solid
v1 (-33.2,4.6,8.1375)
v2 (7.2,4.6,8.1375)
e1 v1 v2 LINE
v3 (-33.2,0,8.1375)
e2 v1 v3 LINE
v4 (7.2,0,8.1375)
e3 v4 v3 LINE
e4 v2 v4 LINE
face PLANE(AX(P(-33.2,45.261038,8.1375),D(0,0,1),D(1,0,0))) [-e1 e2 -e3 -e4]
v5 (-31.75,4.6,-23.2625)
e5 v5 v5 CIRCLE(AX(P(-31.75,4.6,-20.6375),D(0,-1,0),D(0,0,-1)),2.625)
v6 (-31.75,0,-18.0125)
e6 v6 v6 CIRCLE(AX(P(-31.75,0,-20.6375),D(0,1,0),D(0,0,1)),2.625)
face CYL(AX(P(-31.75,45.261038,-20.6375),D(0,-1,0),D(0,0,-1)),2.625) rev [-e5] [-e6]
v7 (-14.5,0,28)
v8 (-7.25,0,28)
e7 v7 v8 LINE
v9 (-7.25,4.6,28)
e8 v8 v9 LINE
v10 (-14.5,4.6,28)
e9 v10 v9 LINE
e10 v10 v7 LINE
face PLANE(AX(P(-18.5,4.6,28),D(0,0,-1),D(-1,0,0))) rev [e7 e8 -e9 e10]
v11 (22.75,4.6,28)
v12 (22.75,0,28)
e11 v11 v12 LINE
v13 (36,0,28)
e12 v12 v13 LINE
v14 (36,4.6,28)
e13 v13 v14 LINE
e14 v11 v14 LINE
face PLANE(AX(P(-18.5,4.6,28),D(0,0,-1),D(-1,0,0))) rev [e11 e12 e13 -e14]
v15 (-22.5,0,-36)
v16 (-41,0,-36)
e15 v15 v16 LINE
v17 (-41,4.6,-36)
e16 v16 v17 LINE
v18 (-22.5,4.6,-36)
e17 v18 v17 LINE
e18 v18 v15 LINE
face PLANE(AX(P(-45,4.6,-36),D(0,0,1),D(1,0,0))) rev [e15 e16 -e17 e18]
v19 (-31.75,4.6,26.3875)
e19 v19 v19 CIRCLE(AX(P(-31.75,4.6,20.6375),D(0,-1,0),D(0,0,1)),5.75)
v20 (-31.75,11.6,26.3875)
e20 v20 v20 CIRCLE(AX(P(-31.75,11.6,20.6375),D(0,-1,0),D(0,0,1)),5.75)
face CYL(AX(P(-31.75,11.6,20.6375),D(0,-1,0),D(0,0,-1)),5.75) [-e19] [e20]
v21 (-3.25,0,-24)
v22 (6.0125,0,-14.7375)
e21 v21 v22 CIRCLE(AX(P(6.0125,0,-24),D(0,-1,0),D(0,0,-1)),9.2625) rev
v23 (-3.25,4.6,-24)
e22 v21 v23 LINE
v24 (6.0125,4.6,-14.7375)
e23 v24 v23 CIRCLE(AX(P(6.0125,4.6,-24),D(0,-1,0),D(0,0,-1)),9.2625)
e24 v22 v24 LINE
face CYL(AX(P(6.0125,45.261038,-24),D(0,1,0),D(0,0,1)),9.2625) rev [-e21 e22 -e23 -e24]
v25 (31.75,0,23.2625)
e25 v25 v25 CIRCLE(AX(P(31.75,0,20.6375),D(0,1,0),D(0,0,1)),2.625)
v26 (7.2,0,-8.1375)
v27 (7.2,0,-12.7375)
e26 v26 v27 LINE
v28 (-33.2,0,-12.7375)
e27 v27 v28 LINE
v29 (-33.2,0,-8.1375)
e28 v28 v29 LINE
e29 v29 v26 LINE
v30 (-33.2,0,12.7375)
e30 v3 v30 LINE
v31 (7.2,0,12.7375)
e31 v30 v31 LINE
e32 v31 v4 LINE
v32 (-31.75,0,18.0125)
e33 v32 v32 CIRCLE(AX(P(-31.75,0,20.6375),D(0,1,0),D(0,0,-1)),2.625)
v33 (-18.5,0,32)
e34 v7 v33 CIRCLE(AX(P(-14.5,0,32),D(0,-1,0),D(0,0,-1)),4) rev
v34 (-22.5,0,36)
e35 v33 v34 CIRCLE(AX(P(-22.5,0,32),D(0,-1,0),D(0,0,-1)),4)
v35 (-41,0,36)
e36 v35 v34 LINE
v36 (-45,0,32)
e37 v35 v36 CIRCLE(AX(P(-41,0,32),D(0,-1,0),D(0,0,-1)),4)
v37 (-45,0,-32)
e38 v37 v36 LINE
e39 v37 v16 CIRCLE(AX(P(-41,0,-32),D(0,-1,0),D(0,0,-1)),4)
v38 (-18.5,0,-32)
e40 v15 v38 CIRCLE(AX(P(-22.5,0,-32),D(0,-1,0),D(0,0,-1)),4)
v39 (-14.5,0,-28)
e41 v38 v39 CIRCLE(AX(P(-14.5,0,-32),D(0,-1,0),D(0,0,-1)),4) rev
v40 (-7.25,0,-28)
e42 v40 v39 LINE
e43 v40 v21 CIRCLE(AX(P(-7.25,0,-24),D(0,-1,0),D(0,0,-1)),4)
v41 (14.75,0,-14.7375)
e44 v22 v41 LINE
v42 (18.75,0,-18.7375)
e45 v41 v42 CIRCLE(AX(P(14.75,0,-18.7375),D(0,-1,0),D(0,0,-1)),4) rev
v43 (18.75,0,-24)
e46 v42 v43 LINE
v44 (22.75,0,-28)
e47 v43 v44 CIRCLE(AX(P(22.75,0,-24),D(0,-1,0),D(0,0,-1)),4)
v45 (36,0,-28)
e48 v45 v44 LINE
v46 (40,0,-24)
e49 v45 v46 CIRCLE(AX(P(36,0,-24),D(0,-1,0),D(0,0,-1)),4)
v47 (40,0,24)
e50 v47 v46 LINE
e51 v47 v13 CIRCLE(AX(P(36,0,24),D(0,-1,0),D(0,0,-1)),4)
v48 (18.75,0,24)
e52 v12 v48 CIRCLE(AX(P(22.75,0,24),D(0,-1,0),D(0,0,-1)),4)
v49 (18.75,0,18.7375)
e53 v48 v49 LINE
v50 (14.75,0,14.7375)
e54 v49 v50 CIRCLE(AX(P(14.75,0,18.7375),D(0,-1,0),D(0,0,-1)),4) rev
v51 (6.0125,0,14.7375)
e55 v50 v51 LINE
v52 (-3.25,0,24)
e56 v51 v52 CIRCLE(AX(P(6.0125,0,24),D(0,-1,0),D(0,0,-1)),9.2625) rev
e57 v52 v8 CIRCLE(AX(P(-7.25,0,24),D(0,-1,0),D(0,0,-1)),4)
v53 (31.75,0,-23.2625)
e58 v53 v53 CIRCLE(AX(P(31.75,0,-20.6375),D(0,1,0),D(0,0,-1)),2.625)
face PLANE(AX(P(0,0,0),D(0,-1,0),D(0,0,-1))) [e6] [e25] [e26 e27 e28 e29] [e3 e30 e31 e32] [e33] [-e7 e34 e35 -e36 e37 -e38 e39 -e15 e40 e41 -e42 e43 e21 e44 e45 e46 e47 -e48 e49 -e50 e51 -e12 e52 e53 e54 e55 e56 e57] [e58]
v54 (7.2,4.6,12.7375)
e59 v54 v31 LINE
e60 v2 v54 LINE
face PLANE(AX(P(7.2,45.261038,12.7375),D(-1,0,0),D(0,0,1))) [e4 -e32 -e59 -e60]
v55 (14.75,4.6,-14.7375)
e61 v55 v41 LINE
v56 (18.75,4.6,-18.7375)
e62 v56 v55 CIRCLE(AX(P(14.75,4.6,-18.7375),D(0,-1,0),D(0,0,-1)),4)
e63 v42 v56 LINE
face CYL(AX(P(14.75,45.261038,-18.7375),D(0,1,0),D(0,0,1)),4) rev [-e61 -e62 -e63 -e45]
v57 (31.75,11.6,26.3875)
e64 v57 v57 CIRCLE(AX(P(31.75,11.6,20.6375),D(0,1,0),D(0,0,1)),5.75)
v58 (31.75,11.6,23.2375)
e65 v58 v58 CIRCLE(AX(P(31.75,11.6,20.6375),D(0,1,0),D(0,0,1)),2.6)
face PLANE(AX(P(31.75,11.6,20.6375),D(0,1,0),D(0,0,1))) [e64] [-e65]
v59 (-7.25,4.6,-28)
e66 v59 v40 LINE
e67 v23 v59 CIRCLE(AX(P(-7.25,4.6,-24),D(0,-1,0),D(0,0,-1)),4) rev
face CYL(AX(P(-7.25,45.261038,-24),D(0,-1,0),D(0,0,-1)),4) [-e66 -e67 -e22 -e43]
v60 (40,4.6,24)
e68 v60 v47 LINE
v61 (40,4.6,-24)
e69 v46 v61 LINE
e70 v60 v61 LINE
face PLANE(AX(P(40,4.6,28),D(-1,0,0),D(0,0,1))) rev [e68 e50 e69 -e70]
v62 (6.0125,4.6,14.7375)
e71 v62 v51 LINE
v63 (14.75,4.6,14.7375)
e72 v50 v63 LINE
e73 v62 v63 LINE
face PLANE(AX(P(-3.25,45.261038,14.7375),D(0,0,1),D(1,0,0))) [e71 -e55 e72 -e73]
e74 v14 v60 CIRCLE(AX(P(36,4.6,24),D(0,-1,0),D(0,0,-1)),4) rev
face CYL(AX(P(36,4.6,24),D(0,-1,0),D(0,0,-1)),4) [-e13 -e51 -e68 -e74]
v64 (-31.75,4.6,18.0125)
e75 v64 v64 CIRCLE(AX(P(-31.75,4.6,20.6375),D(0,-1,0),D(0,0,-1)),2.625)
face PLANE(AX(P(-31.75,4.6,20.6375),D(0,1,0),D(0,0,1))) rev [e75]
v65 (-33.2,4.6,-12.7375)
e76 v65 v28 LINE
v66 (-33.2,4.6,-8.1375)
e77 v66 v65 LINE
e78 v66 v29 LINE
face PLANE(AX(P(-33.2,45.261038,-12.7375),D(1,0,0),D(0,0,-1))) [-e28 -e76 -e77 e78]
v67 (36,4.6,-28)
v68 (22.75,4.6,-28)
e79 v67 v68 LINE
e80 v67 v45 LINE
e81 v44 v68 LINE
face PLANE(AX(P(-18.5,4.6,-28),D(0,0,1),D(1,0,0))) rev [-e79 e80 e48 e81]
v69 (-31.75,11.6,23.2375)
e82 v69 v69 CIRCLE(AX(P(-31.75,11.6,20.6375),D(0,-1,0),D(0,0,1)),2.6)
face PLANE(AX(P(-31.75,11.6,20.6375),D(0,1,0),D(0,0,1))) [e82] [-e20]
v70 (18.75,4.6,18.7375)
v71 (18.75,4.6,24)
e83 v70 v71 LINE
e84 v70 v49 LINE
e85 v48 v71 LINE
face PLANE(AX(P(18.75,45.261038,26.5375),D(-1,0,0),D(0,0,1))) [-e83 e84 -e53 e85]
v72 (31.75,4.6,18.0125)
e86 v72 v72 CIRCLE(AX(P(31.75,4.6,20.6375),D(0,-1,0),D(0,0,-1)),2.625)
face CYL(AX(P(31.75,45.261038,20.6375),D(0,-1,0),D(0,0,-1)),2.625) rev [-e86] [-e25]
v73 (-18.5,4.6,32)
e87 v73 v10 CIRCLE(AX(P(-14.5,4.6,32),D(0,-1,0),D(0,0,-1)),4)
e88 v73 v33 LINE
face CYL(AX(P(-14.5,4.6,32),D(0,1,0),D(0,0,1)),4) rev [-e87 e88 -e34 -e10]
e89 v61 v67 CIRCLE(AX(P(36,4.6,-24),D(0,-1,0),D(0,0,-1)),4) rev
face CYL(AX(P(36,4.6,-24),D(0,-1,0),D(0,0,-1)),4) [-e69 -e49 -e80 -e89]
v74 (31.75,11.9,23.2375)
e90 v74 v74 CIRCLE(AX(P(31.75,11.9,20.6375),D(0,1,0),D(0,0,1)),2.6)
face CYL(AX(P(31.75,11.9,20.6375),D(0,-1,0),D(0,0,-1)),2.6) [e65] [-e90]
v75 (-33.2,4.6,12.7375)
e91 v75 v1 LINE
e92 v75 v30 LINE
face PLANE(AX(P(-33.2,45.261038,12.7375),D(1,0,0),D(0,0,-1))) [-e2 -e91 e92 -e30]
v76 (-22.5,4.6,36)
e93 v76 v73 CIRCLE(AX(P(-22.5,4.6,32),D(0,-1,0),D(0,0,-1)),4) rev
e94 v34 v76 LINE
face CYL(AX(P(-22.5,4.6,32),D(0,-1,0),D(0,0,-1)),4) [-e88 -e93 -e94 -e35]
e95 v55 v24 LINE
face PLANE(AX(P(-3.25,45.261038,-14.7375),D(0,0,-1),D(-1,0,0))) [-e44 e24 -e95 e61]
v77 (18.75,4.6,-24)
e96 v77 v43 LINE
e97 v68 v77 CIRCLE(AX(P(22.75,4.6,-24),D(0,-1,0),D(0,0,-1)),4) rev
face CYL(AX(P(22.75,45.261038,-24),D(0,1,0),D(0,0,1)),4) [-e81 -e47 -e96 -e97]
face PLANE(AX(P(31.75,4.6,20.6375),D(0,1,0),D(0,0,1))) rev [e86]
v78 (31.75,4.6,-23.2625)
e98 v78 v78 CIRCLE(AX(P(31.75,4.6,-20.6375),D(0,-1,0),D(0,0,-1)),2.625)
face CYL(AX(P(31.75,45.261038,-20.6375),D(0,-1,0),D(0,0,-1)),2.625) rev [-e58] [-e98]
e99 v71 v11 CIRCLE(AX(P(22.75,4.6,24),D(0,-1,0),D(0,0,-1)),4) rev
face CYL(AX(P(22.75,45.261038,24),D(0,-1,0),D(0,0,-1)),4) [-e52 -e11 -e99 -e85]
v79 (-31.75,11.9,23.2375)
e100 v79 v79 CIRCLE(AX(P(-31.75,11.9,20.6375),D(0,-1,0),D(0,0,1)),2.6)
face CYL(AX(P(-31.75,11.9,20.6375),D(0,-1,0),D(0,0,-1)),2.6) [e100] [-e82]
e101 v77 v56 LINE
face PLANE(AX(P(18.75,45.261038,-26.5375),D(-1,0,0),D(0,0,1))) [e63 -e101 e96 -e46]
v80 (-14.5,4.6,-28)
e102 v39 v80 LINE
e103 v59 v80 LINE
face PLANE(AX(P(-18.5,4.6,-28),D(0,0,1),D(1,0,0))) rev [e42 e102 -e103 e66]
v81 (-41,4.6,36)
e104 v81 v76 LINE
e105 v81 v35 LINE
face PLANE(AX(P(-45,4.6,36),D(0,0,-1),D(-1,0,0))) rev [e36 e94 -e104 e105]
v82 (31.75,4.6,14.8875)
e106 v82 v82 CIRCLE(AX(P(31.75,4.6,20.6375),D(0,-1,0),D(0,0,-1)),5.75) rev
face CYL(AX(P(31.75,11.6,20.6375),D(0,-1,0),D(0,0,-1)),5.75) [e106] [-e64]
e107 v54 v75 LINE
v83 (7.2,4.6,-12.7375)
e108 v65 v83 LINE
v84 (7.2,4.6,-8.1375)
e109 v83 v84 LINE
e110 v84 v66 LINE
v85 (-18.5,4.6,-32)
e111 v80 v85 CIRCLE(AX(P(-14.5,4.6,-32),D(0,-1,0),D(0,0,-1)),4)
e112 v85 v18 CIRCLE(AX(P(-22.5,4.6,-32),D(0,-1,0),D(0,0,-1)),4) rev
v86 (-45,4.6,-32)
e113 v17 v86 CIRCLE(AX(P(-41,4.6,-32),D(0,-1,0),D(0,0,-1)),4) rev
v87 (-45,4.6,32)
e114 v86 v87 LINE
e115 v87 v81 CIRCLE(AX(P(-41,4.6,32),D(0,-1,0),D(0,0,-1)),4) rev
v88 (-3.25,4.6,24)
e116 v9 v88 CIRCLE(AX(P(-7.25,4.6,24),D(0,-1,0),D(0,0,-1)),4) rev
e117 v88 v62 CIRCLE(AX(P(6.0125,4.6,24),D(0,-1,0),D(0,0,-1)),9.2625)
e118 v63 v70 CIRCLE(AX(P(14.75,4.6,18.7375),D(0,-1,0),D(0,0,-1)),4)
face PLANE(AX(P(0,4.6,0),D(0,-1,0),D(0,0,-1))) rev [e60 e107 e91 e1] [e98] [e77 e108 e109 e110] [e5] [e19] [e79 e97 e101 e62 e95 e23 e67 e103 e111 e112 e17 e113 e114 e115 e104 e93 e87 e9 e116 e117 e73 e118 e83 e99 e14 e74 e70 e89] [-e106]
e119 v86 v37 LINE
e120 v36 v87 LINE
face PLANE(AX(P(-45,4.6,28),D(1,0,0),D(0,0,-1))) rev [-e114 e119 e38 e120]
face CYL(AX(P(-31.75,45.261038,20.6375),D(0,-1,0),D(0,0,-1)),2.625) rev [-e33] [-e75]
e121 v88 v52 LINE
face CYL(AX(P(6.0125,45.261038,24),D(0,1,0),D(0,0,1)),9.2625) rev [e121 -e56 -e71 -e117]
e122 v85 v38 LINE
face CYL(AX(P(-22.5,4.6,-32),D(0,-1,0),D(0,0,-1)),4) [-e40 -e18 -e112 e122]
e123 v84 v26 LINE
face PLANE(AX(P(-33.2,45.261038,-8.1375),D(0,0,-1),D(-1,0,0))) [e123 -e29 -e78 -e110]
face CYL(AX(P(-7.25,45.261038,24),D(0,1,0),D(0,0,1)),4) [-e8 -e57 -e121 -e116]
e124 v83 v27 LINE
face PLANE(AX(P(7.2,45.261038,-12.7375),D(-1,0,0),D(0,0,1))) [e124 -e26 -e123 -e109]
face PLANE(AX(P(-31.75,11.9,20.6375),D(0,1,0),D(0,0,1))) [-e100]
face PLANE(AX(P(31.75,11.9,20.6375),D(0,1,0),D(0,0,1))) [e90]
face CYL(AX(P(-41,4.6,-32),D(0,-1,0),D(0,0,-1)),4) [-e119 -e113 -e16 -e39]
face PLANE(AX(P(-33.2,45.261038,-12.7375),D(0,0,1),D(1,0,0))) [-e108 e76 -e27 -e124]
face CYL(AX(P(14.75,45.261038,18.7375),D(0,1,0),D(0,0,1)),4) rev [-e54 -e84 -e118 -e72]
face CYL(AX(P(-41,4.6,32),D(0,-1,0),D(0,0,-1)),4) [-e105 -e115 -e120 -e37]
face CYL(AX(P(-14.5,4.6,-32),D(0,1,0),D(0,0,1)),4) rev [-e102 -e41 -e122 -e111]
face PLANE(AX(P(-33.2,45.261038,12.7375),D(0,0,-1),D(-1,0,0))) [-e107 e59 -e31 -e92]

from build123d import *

# Parameters (mm, degrees)
EXTRUDE_1_DEPTH     = 4.6
SKETCH_1_R          = 2.625
SKETCH_1_W          = 40.4
SKETCH_1_H          = 4.6
CUT_EXTRUDE_1_DEPTH = 4.6
SKETCH_5_R          = 5.75
EXTRUDE_2_DEPTH     = 7
SKETCH_6_R          = 2.6
EXTRUDE_3_DEPTH     = 0.3
FILLET_2_R          = 4
FILLET_3_R          = 9.2625


with BuildPart() as part:
    # 草图3 → 凸台-拉伸1 (new body)
    with BuildSketch(Plane(origin=(0, 0, 0), x_dir=(1, 0, 0), z_dir=(0, 1, 0))):
        Polygon((-18.5, -28), (40, -28), (40, 28), (-18.5, 28), (-18.5, 36), (-45, 36), (-45, 28), (-45, -28), (-45, -36), (-18.5, -36), align=None)
    extrude(amount=EXTRUDE_1_DEPTH)

    # 草图1 → 切除-拉伸1 (cut)
    with BuildSketch(Plane(origin=(0, 0, 0), x_dir=(1, 0, 0), z_dir=(0, 1, 0))):
        with Locations(Location((-31.75, 20.6375, 0), (0, 0, 90))):
            Circle(SKETCH_1_R)
        with Locations(Location((31.75, 20.6375, 0), (0, 0, 90))):
            Circle(SKETCH_1_R)
        with Locations(Location((31.75, -20.6375, 0), (0, 0, 90))):
            Circle(SKETCH_1_R)
        with Locations(Location((-31.75, -20.6375, 0), (0, 0, 90))):
            Circle(SKETCH_1_R)
        with Locations((-13, -10.4375)):
            Rectangle(SKETCH_1_W, SKETCH_1_H)
        with Locations((-13, 10.4375)):
            Rectangle(SKETCH_1_W, SKETCH_1_H)
        Polygon((-3.25, -26.5375), (-3.25, -14.7375), (18.75, -14.7375), (18.75, -26.5375), (18.75, -29.869530405), (-3.25, -29.869530405), align=None)
        Polygon((-3.25, 14.7375), (18.75, 14.7375), (18.75, 26.5375), (18.75, 29.869530405), (-3.25, 29.869530405), (-3.25, 26.5375), align=None)
    extrude(amount=CUT_EXTRUDE_1_DEPTH, mode=Mode.SUBTRACT)

    # 草图5 → 凸台-拉伸2 (add)
    with BuildSketch(Plane(origin=(0, 4.6, 0), x_dir=(1, 0, 0), z_dir=(0, 1, 0))):
        with Locations(Location((31.75, -20.6375, 0), (0, 0, 90))):
            Circle(SKETCH_5_R)
    extrude_2 = extrude(amount=EXTRUDE_2_DEPTH)

    # 草图6 → 凸台-拉伸3 (add)
    with BuildSketch(Plane(origin=(0, 11.6, 0), x_dir=(1, 0, 0), z_dir=(0, 1, 0))):
        with Locations(Location((31.75, -20.6375, 0), (0, 0, 270))):
            Circle(SKETCH_6_R)
    extrude_3 = extrude(amount=EXTRUDE_3_DEPTH)

    # 圆角2
    fillet_2_edges = [part.edges().sort_by_distance(p)[0] for p in [
        (-3.25, 2.3, -28),
        (18.75, 2.3, -28),
        (40, 2.3, -28),
        (40, 2.3, 28),
        (18.75, 2.3, 28),
        (-3.25, 2.3, 28),
        (18.75, 2.3, -14.7375),
        (18.75, 2.3, 14.7375),
        (-18.5, 2.3, 28),
        (-18.5, 2.3, 36),
        (-45, 2.3, 36),
        (-45, 2.3, -36),
        (-18.5, 2.3, -36),
        (-18.5, 2.3, -28),
    ]]
    fillet(fillet_2_edges, radius=FILLET_2_R - 0.0001)  # a hair under: the kernel refuses the full size

    # 镜向1: 凸台-拉伸2, 凸台-拉伸3 across plane
    add(extrude_2.mirror(Plane(origin=(0, 0, 0), x_dir=(0, 0, 1), z_dir=(1, 0, 0))))
    add(extrude_3.mirror(Plane(origin=(0, 0, 0), x_dir=(0, 0, 1), z_dir=(1, 0, 0))))

    # 圆角3
    fillet_3_edges = [part.edges().sort_by_distance(p)[0] for p in [
        (-3.25, 2.3, -14.7375),
        (-3.25, 2.3, 14.7375),
    ]]
    fillet(fillet_3_edges, radius=FILLET_3_R)


solid = part.part
